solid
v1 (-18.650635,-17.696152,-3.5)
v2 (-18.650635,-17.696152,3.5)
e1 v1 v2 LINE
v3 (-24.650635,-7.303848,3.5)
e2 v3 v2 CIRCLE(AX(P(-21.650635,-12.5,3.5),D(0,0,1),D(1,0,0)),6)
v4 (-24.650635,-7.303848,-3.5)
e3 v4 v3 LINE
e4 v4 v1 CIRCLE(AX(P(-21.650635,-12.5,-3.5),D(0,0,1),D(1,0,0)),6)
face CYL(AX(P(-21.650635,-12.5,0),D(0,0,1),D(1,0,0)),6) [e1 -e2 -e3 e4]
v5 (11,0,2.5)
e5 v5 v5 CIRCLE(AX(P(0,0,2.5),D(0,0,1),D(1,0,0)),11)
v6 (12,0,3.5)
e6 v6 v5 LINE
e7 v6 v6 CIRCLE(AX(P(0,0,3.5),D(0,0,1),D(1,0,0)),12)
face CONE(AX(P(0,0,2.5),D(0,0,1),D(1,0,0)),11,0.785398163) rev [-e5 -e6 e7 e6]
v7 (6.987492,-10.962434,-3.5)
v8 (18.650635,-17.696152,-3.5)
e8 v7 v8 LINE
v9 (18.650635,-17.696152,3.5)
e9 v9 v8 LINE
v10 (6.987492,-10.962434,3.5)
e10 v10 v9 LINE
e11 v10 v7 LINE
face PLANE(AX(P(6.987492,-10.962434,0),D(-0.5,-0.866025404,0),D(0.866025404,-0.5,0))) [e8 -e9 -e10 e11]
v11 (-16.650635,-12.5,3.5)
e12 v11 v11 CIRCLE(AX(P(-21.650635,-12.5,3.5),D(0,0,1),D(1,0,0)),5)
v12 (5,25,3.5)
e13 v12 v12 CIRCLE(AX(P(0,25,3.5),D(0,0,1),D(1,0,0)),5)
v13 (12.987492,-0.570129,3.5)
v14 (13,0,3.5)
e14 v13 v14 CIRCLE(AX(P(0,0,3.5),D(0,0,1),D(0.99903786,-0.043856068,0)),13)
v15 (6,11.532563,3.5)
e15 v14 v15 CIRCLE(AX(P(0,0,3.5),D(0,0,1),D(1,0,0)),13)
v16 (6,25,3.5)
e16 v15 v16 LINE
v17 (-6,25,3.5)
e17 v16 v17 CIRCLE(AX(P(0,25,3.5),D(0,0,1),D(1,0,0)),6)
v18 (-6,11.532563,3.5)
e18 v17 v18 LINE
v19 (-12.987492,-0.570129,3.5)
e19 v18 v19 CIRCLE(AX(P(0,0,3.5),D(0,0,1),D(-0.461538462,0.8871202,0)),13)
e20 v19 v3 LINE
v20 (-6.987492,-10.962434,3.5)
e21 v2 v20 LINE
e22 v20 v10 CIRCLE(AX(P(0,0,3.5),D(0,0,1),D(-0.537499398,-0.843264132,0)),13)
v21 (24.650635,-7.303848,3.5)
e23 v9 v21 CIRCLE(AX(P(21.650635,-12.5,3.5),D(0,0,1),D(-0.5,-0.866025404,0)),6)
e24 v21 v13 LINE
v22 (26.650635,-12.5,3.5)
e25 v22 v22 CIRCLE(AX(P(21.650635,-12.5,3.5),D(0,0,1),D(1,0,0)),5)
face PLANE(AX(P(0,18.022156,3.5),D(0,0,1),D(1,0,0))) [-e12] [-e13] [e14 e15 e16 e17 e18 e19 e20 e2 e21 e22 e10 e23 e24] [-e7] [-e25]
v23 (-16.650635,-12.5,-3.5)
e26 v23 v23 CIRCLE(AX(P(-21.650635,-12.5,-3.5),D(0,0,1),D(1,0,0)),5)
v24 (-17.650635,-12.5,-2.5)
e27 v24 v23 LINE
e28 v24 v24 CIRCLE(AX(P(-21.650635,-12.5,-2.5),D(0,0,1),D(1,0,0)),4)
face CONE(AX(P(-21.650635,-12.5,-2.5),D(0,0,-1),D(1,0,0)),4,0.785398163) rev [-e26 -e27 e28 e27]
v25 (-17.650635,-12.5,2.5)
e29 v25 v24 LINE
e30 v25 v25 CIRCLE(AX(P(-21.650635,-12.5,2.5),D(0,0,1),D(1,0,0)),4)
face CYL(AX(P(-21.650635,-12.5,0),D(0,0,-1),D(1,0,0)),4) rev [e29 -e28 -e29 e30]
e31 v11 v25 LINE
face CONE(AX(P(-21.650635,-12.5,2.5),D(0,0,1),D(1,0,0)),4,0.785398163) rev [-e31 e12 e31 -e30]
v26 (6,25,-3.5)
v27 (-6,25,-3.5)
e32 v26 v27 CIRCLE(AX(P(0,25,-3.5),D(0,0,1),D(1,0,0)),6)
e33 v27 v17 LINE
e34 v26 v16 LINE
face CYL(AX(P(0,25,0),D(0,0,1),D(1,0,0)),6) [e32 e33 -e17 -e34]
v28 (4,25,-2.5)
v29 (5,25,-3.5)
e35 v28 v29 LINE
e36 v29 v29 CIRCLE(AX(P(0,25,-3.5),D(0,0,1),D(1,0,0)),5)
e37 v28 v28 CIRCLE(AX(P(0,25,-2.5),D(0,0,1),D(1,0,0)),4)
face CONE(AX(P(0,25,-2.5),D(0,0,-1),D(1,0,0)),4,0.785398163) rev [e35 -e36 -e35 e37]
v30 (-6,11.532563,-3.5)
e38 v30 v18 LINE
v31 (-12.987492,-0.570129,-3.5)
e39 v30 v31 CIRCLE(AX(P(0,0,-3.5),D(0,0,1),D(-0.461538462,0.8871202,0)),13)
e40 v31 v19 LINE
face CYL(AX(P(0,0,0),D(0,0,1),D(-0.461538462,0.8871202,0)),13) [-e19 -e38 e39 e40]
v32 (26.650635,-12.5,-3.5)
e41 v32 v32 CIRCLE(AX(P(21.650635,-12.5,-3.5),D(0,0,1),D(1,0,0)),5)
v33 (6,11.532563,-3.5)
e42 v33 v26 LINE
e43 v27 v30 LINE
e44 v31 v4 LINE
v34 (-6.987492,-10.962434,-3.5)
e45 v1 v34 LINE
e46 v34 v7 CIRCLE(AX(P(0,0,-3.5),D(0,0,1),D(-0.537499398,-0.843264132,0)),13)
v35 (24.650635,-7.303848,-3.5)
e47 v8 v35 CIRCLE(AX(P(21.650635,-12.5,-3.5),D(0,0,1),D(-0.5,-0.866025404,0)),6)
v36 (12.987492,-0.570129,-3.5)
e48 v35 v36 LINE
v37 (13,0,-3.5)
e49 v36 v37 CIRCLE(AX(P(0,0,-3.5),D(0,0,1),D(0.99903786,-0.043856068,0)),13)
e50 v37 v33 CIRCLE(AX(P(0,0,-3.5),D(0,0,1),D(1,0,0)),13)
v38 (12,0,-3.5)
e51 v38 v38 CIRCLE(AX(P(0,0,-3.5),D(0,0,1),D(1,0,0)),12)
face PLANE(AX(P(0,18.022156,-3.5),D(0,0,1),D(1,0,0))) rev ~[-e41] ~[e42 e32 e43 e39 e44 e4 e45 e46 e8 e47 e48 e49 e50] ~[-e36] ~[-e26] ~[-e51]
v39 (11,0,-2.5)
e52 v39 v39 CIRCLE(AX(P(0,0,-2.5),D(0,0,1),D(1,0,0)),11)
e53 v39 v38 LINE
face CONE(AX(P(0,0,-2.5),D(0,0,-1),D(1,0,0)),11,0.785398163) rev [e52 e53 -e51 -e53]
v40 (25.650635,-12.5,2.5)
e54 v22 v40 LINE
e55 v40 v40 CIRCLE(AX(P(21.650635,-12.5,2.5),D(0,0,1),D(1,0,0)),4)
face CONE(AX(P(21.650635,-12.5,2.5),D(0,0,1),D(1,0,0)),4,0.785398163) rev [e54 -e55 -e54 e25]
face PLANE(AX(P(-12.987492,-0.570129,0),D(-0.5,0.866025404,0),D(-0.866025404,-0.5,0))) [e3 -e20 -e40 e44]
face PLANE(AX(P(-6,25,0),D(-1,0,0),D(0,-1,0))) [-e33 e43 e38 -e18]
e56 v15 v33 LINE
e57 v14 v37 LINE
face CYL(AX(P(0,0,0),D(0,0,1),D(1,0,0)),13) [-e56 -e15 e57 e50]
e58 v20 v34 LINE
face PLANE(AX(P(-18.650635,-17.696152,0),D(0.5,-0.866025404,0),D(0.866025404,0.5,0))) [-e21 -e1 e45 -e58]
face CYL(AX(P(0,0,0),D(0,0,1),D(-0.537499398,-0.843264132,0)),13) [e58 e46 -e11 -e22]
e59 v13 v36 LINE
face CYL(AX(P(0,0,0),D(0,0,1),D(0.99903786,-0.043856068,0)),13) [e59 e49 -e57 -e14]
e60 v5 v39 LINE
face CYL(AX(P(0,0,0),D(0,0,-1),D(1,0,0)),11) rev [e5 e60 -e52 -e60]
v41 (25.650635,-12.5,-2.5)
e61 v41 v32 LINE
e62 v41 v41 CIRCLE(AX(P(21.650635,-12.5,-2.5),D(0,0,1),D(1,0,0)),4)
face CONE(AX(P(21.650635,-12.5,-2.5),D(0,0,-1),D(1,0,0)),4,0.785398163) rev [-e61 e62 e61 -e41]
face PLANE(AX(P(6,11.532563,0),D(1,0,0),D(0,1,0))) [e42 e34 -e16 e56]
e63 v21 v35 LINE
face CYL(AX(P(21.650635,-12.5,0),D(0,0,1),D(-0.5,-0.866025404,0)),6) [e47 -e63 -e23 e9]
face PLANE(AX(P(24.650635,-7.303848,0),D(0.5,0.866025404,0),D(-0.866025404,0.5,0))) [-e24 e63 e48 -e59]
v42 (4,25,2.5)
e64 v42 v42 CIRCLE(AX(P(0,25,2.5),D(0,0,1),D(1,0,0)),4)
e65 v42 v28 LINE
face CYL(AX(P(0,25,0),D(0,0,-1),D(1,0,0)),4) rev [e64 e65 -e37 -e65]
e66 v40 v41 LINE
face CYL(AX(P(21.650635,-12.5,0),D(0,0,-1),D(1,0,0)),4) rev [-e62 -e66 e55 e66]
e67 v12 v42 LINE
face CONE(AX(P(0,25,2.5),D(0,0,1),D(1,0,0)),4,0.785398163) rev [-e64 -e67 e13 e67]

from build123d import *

# Parameters (mm, degrees)
F0_R     = 11
F0_R_2   = 4
F1_DEPTH = 3.5
F2_SIZE  = 1


# Not quite as in the source:
# - a feature names something its author has since deleted; it is built from what else it names


with BuildPart() as f1:
    # F0 (on Top) → F1 (new body, symmetric)
    with BuildSketch(Plane.XY):
        with BuildLine():
            ThreePointArc((-6, 11.5325625947), (0, 13), (6, 11.5325625947))
            Line((6, 11.5325625947), (6, 25))
            ThreePointArc((6, 25), (0, 19), (-6, 25))
            Line((-6, 25), (-6, 11.5325625947))
        make_face()
        with BuildLine():
            ThreePointArc((-6.9874921777, -10.96243372), (-11.2583302492, -6.5), (-12.9874921777, -0.5701288746))
            Line((-12.9874921777, -0.5701288746), (-24.6506350946, -7.3038475773))
            ThreePointArc((-24.6506350946, -7.3038475773), (-18.6506350946, -7.3038475773), (-15.6506350946, -12.5))
            ThreePointArc((-15.6506350946, -12.5), (-16.4544826719, -15.5), (-18.6506350946, -17.6961524227))
            Line((-18.6506350946, -17.6961524227), (-6.9874921777, -10.96243372))
        make_face()
        with BuildLine():
            Line((24.6506350946, -7.3038475773), (12.9874921777, -0.5701288746))
            ThreePointArc((12.9874921777, -0.5701288746), (11.2583302492, -6.5), (6.9874921777, -10.96243372))
            Line((6.9874921777, -10.96243372), (18.6506350946, -17.6961524227))
            ThreePointArc((18.6506350946, -17.6961524227), (16.4544826719, -9.5), (24.6506350946, -7.3038475773))
        make_face()
        with BuildLine():
            ThreePointArc((12.9874921777, -0.5701288746), (12.9968726683, -0.2851330301), (13, 0))
            ThreePointArc((13, 0), (11.1130553854, 6.7453687816), (6, 11.5325625947))
            ThreePointArc((6, 11.5325625947), (0, 13), (-6, 11.5325625947))
            ThreePointArc((-6, 11.5325625947), (-11.2583302492, 6.5), (-12.9874921777, -0.5701288746))
            ThreePointArc((-12.9874921777, -0.5701288746), (-11.2583302492, -6.5), (-6.9874921777, -10.96243372))
            ThreePointArc((-6.9874921777, -10.96243372), (0, -13), (6.9874921777, -10.96243372))
            ThreePointArc((6.9874921777, -10.96243372), (11.2583302492, -6.5), (12.9874921777, -0.5701288746))
        make_face()
        Circle(F0_R, mode=Mode.SUBTRACT)
        with BuildLine():
            ThreePointArc((-6, 25), (0, 19), (6, 25))
            ThreePointArc((6, 25), (0, 31), (-6, 25))
        make_face()
        with Locations((0, 25)):
            Circle(F0_R_2, mode=Mode.SUBTRACT)
        with BuildLine():
            ThreePointArc((-15.6506350946, -12.5), (-18.6506350946, -7.3038475773), (-24.6506350946, -7.3038475773))
            ThreePointArc((-24.6506350946, -7.3038475773), (-26.8467875173, -15.5), (-18.6506350946, -17.6961524227))
            ThreePointArc((-18.6506350946, -17.6961524227), (-16.4544826719, -15.5), (-15.6506350946, -12.5))
        make_face()
        with Locations((-21.6506350946, -12.5)):
            Circle(F0_R_2, mode=Mode.SUBTRACT)
        with BuildLine():
            ThreePointArc((27.6506350946, -12.5), (26.8467875173, -9.5), (24.6506350946, -7.3038475773))
            ThreePointArc((24.6506350946, -7.3038475773), (16.4544826719, -9.5), (18.6506350946, -17.6961524227))
            ThreePointArc((18.6506350946, -17.6961524227), (24.6506350946, -17.6961524227), (27.6506350946, -12.5))
        make_face()
        with Locations((21.6506350946, -12.5)):
            Circle(F0_R_2, mode=Mode.SUBTRACT)
    extrude(amount=F1_DEPTH, both=True)

    # F2
    f2_edges = [f1.edges().sort_by_distance(p)[0] for p in [
        (-4, 25, 3.5),
        (-11, 0, 3.5),
        (-25.650635, -12.5, 3.5),
        (17.650635, -12.5, 3.5),
        (-25.650635, -12.5, -3.5),
        (-11, 0, -3.5),
        (17.650635, -12.5, -3.5),
        (-4, 25, -3.5),
    ]]
    chamfer(f2_edges, length=F2_SIZE)


solid = f1.part
